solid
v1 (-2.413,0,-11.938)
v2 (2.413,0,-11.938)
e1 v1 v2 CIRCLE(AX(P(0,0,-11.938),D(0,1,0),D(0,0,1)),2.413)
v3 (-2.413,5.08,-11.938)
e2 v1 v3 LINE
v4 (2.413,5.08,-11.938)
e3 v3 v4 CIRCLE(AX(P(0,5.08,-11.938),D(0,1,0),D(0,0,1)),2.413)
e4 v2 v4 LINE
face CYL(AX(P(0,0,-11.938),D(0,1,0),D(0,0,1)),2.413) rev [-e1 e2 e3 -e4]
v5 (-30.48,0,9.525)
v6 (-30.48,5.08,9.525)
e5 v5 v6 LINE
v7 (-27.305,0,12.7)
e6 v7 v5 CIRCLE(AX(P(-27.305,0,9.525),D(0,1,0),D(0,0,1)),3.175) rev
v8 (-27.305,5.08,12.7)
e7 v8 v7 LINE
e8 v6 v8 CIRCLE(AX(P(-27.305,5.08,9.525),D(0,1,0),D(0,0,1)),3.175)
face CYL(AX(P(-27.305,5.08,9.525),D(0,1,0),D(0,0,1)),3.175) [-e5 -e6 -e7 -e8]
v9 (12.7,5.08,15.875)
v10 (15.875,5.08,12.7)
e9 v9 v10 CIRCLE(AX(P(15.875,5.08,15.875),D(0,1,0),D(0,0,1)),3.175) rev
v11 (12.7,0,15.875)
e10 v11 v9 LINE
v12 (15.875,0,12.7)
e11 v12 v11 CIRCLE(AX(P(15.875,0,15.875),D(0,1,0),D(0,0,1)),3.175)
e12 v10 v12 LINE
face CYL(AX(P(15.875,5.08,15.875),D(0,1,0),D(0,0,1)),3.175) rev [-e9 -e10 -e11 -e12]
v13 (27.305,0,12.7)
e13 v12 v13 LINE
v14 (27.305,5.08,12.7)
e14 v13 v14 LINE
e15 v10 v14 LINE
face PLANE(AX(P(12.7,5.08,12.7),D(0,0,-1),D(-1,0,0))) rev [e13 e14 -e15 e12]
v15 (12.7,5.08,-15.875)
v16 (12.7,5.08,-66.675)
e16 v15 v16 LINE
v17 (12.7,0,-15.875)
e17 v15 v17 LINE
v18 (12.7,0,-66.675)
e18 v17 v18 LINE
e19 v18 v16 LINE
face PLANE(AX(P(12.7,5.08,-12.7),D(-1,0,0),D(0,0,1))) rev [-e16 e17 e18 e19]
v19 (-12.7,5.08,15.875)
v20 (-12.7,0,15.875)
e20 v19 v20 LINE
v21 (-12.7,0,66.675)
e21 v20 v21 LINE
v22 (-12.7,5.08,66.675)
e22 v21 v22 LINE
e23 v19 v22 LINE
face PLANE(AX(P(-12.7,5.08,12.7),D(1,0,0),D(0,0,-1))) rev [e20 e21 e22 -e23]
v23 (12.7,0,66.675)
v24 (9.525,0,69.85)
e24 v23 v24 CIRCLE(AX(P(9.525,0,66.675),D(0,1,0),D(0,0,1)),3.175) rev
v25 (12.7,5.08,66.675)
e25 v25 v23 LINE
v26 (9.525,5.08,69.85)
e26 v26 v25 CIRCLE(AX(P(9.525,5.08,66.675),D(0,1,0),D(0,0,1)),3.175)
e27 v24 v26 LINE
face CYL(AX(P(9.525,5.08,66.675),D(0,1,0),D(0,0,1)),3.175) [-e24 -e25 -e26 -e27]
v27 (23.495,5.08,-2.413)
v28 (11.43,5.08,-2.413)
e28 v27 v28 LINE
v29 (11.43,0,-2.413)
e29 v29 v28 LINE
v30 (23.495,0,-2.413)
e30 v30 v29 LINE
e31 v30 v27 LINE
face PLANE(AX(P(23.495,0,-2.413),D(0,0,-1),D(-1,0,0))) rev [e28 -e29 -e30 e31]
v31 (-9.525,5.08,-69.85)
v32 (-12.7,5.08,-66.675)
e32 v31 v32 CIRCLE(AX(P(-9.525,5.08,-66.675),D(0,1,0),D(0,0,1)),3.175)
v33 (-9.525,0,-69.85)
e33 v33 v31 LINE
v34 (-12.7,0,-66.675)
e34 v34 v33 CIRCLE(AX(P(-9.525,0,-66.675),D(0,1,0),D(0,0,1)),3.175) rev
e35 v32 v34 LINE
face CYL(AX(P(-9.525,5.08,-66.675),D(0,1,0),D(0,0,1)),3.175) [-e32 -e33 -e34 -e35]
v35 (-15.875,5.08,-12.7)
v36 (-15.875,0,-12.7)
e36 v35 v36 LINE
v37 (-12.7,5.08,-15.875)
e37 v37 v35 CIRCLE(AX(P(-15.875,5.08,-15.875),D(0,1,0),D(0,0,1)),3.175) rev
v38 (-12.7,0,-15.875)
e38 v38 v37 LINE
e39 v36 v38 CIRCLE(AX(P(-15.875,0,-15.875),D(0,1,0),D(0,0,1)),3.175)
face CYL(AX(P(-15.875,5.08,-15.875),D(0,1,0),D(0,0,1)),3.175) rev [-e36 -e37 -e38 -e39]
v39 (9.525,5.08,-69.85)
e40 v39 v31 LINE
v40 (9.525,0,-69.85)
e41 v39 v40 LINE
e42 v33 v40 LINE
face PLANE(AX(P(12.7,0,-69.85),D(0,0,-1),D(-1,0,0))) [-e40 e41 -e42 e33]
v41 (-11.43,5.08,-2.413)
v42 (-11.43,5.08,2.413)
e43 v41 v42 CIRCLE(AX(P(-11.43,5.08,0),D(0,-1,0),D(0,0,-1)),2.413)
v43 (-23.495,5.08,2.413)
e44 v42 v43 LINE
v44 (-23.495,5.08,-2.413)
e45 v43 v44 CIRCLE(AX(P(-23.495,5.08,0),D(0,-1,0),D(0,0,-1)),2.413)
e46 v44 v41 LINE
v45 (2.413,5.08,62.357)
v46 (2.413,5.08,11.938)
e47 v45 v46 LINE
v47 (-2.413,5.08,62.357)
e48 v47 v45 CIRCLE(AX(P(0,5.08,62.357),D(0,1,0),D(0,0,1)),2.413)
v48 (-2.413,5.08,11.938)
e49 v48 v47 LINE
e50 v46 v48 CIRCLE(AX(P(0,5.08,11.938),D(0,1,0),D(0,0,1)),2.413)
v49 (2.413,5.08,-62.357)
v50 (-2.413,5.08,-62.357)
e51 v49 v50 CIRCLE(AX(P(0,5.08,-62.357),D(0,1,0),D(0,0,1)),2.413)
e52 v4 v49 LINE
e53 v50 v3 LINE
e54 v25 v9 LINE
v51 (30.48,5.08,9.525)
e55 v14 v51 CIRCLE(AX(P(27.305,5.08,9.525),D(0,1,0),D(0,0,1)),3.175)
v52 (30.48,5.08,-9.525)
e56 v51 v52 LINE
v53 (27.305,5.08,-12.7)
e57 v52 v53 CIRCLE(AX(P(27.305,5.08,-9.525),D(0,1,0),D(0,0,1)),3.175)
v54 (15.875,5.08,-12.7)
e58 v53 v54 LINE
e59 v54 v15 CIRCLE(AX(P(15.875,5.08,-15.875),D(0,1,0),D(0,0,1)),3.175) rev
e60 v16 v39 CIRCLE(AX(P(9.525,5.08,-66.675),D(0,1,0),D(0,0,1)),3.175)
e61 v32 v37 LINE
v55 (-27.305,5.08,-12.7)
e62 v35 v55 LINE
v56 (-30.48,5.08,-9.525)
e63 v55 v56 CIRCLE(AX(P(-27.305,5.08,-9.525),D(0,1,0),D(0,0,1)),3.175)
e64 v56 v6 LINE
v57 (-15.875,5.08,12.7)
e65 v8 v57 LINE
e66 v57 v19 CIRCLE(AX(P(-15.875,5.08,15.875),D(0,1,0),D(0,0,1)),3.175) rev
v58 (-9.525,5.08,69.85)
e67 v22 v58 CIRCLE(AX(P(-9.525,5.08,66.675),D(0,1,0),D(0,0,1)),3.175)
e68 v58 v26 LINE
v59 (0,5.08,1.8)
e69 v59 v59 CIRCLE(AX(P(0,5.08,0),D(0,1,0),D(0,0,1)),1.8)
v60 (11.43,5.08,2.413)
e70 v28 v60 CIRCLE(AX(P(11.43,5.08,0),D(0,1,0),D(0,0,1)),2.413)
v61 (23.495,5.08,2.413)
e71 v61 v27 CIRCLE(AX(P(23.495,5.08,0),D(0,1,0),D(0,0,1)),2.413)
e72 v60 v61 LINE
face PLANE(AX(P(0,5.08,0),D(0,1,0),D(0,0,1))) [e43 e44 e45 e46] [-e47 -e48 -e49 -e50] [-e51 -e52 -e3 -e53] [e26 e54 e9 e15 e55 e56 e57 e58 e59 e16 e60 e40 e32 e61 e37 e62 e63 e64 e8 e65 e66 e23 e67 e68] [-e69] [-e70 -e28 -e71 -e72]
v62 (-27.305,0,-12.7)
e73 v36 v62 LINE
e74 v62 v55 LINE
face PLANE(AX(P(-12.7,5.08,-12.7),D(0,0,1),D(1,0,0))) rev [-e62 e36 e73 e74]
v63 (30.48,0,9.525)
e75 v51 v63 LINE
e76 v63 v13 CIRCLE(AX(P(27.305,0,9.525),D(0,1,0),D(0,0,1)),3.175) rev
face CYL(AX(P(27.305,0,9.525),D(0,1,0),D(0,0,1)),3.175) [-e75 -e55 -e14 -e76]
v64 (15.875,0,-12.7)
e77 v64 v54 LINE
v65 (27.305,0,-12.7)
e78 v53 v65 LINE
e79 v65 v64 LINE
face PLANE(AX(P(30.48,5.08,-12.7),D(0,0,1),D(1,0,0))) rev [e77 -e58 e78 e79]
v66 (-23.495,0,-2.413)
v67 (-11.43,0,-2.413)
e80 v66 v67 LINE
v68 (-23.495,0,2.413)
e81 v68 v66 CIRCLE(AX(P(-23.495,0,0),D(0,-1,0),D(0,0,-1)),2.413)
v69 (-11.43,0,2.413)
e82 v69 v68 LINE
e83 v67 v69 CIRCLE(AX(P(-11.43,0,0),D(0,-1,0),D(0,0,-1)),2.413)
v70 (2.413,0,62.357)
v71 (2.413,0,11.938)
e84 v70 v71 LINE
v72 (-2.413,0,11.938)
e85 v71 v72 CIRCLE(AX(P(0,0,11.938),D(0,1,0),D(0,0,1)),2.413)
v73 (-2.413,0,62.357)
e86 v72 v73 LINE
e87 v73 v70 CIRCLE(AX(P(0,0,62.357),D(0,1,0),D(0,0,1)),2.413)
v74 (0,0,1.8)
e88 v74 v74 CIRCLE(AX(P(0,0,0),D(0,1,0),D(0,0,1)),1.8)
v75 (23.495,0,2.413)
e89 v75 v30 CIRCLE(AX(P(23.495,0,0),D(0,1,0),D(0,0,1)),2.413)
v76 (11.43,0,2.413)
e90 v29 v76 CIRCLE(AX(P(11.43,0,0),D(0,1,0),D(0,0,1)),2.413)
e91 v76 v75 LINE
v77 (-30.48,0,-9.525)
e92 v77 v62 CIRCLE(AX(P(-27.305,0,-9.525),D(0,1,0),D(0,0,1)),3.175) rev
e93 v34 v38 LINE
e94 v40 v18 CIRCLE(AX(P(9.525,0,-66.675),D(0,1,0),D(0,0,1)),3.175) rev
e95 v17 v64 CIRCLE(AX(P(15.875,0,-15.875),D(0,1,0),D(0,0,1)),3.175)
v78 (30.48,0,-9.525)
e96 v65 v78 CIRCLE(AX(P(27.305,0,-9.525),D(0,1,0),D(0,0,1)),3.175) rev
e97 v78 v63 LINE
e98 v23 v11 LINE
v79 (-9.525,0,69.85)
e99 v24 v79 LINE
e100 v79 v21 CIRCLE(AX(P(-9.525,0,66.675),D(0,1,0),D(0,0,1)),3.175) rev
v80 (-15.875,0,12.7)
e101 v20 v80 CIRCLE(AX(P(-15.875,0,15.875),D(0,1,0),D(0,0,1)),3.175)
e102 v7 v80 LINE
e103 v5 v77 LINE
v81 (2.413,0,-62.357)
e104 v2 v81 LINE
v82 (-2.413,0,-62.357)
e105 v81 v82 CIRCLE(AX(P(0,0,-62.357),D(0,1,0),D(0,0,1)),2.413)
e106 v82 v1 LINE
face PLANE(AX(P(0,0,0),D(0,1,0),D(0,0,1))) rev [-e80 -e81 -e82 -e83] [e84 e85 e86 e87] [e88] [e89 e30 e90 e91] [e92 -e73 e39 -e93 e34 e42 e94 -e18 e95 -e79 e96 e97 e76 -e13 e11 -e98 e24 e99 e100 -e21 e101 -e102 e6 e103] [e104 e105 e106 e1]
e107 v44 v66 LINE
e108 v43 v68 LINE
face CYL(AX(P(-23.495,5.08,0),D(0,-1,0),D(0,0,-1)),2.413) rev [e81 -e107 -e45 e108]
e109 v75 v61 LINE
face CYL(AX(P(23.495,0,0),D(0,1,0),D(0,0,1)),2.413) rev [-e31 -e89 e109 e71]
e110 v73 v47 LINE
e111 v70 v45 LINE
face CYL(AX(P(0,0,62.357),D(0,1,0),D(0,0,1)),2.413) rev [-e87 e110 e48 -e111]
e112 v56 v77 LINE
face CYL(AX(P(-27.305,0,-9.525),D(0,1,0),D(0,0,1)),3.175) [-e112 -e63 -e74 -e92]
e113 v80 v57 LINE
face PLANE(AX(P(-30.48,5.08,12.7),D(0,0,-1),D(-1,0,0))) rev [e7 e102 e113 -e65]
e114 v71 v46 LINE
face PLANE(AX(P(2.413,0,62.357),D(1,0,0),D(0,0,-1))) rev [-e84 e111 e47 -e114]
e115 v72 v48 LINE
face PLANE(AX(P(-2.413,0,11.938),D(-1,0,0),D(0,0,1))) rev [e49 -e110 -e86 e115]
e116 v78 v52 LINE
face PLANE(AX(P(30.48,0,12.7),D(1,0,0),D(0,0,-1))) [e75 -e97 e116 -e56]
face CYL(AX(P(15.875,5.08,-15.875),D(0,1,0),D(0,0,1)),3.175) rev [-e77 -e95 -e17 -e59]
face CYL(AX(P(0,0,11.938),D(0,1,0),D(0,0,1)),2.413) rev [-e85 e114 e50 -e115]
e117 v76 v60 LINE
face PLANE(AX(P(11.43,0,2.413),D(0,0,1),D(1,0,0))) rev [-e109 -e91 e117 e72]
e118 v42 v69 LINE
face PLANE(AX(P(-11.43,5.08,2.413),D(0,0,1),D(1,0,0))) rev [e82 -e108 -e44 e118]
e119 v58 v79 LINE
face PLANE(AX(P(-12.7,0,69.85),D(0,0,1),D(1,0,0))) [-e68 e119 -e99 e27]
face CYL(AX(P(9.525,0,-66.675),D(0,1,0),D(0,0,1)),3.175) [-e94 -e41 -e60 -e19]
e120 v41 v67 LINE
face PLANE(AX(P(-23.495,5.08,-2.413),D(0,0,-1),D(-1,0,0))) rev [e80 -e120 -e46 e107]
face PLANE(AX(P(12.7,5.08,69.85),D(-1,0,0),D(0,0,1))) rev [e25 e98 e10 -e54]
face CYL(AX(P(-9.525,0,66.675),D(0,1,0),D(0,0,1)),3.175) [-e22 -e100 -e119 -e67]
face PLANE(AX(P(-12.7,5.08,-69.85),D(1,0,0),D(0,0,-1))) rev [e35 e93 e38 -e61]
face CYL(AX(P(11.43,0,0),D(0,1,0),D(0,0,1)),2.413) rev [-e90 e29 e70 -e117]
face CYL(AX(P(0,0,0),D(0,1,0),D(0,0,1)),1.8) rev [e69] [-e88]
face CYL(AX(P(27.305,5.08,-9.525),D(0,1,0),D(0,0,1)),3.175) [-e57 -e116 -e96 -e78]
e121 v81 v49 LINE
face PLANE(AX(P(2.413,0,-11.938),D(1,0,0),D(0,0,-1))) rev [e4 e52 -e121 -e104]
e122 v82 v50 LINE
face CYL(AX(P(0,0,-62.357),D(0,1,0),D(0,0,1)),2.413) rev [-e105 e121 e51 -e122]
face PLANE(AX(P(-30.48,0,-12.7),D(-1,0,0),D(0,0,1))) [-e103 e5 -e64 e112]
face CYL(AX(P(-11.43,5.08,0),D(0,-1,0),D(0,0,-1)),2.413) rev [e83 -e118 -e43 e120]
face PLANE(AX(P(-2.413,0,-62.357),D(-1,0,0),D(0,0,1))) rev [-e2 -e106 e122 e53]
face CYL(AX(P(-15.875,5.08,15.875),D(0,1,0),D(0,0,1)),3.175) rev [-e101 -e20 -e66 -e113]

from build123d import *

# Parameters (mm, degrees)
CUT_EXTRUDE1_START = -5.08
CUT_EXTRUDE1_DEPTH = 5.08
SKETCH2_W          = 17.78
SKETCH2_H          = 57.15
CUT_EXTRUDE2_DEPTH = 77.379704765
SKETCH3_W          = 17.78
SKETCH3_H          = 57.15
CUT_EXTRUDE3_DEPTH = 77.379704765
SKETCH4_W          = 17.78
SKETCH4_H          = 57.15
CUT_EXTRUDE4_DEPTH = 77.379704765
CUT_EXTRUDE5_DEPTH = 77.379704765
CUT_EXTRUDE6_DEPTH = 77.379704765
CUT_EXTRUDE7_DEPTH = 77.379704765
CUT_EXTRUDE8_DEPTH = 77.379704765
FILLET1_R          = 3.175
SKETCH11_R         = 1.8
CUT_EXTRUDE9_DEPTH = 77.379704765


with BuildPart() as part:
    # Cut-Extrude1: read off the stored shape, not the designer's step
    # Cut-Extrude1 outline → Cut-Extrude1 (new body)
    with BuildSketch(Plane.XZ.offset(CUT_EXTRUDE1_START)):
        Polygon((-12.7, -12.7), (-12.7, -69.85), (30.48, -69.85), (30.48, 69.85), (-30.48, 69.85), (-30.48, -12.7), align=None)
    extrude(amount=CUT_EXTRUDE1_DEPTH)

    # Sketch2 → Cut-Extrude2 (cut, through all)
    with BuildSketch(Plane.XZ):
        with Locations((-21.59, 41.275)):
            Rectangle(SKETCH2_W, SKETCH2_H)
    extrude(amount=-CUT_EXTRUDE2_DEPTH, mode=Mode.SUBTRACT)

    # Sketch3 → Cut-Extrude3 (cut, through all)
    with BuildSketch(Plane.XZ):
        with Locations((21.59, 41.275)):
            Rectangle(SKETCH3_W, SKETCH3_H)
    extrude(amount=-CUT_EXTRUDE3_DEPTH, mode=Mode.SUBTRACT)

    # Sketch4 → Cut-Extrude4 (cut, through all)
    with BuildSketch(Plane.XZ):
        with Locations((21.59, -41.275)):
            Rectangle(SKETCH4_W, SKETCH4_H)
    extrude(amount=-CUT_EXTRUDE4_DEPTH, mode=Mode.SUBTRACT)

    # Sketch5 → Cut-Extrude5 (cut, through all)
    with BuildSketch(Plane(origin=(0, 5.08, 0), x_dir=(-1, 0, 0), z_dir=(0, 1, 0))):
        with BuildLine():
            Line((2.413, -62.357), (2.413, -11.938))
            ThreePointArc((2.413, -11.938), (0, -9.525), (-2.413, -11.938))
            Line((-2.413, -11.938), (-2.413, -62.357))
            ThreePointArc((-2.413, -62.357), (0, -64.77), (2.413, -62.357))
        make_face()
    extrude(amount=-CUT_EXTRUDE5_DEPTH, mode=Mode.SUBTRACT)

    # Sketch6 → Cut-Extrude6 (cut, through all)
    with BuildSketch(Plane(origin=(0, 5.08, 0), x_dir=(-1, 0, 0), z_dir=(0, 1, 0))):
        with BuildLine():
            Line((-2.413, 62.357), (-2.413, 11.938))
            ThreePointArc((-2.413, 11.938), (0, 9.525), (2.413, 11.938))
            Line((2.413, 11.938), (2.413, 62.357))
            ThreePointArc((2.413, 62.357), (0, 64.77), (-2.413, 62.357))
        make_face()
    extrude(amount=-CUT_EXTRUDE6_DEPTH, mode=Mode.SUBTRACT)

    # Sketch7 → Cut-Extrude7 (cut, through all)
    with BuildSketch(Plane(origin=(0, 5.08, 0), x_dir=(-1, 0, 0), z_dir=(0, 1, 0))):
        with BuildLine():
            Line((-23.495, -2.413), (-11.43, -2.413))
            ThreePointArc((-11.43, -2.413), (-9.017, 0), (-11.43, 2.413))
            Line((-11.43, 2.413), (-23.495, 2.413))
            ThreePointArc((-23.495, 2.413), (-25.908, 0), (-23.495, -2.413))
        make_face()
    extrude(amount=-CUT_EXTRUDE7_DEPTH, mode=Mode.SUBTRACT)

    # Sketch8 → Cut-Extrude8 (cut, through all)
    with BuildSketch(Plane.XZ):
        with BuildLine():
            Line((-23.495, -2.413), (-11.43, -2.413))
            ThreePointArc((-11.43, -2.413), (-9.017, 0), (-11.43, 2.413))
            Line((-11.43, 2.413), (-23.495, 2.413))
            ThreePointArc((-23.495, 2.413), (-25.908, 0), (-23.495, -2.413))
        make_face()
    extrude(amount=-CUT_EXTRUDE8_DEPTH, mode=Mode.SUBTRACT)

    # Fillet1
    fillet1_edges = [part.edges().sort_by_distance(p)[0] for p in [
        (-30.48, 2.54, -12.7),
        (-12.7, 2.54, -12.7),
        (-12.7, 2.54, -69.85),
        (-12.7, 2.54, 69.85),
        (-12.7, 2.54, 12.7),
        (-30.48, 2.54, 12.7),
        (12.7, 2.54, 69.85),
        (30.48, 2.54, 12.7),
        (12.7, 2.54, 12.7),
        (30.48, 2.54, -12.7),
        (12.7, 2.54, -69.85),
        (12.7, 2.54, -12.7),
    ]]
    fillet(fillet1_edges, radius=FILLET1_R)

    # Sketch11 → Cut-Extrude9 (cut, through all)
    with BuildSketch(Plane(origin=(0, 5.08, 0), x_dir=(1, 0, 0), z_dir=(0, 1, 0))):
        with Locations(Location((0, 0, 0), (0, 0, 270))):
            Circle(SKETCH11_R)
    extrude(amount=-CUT_EXTRUDE9_DEPTH, mode=Mode.SUBTRACT)


solid = part.part
